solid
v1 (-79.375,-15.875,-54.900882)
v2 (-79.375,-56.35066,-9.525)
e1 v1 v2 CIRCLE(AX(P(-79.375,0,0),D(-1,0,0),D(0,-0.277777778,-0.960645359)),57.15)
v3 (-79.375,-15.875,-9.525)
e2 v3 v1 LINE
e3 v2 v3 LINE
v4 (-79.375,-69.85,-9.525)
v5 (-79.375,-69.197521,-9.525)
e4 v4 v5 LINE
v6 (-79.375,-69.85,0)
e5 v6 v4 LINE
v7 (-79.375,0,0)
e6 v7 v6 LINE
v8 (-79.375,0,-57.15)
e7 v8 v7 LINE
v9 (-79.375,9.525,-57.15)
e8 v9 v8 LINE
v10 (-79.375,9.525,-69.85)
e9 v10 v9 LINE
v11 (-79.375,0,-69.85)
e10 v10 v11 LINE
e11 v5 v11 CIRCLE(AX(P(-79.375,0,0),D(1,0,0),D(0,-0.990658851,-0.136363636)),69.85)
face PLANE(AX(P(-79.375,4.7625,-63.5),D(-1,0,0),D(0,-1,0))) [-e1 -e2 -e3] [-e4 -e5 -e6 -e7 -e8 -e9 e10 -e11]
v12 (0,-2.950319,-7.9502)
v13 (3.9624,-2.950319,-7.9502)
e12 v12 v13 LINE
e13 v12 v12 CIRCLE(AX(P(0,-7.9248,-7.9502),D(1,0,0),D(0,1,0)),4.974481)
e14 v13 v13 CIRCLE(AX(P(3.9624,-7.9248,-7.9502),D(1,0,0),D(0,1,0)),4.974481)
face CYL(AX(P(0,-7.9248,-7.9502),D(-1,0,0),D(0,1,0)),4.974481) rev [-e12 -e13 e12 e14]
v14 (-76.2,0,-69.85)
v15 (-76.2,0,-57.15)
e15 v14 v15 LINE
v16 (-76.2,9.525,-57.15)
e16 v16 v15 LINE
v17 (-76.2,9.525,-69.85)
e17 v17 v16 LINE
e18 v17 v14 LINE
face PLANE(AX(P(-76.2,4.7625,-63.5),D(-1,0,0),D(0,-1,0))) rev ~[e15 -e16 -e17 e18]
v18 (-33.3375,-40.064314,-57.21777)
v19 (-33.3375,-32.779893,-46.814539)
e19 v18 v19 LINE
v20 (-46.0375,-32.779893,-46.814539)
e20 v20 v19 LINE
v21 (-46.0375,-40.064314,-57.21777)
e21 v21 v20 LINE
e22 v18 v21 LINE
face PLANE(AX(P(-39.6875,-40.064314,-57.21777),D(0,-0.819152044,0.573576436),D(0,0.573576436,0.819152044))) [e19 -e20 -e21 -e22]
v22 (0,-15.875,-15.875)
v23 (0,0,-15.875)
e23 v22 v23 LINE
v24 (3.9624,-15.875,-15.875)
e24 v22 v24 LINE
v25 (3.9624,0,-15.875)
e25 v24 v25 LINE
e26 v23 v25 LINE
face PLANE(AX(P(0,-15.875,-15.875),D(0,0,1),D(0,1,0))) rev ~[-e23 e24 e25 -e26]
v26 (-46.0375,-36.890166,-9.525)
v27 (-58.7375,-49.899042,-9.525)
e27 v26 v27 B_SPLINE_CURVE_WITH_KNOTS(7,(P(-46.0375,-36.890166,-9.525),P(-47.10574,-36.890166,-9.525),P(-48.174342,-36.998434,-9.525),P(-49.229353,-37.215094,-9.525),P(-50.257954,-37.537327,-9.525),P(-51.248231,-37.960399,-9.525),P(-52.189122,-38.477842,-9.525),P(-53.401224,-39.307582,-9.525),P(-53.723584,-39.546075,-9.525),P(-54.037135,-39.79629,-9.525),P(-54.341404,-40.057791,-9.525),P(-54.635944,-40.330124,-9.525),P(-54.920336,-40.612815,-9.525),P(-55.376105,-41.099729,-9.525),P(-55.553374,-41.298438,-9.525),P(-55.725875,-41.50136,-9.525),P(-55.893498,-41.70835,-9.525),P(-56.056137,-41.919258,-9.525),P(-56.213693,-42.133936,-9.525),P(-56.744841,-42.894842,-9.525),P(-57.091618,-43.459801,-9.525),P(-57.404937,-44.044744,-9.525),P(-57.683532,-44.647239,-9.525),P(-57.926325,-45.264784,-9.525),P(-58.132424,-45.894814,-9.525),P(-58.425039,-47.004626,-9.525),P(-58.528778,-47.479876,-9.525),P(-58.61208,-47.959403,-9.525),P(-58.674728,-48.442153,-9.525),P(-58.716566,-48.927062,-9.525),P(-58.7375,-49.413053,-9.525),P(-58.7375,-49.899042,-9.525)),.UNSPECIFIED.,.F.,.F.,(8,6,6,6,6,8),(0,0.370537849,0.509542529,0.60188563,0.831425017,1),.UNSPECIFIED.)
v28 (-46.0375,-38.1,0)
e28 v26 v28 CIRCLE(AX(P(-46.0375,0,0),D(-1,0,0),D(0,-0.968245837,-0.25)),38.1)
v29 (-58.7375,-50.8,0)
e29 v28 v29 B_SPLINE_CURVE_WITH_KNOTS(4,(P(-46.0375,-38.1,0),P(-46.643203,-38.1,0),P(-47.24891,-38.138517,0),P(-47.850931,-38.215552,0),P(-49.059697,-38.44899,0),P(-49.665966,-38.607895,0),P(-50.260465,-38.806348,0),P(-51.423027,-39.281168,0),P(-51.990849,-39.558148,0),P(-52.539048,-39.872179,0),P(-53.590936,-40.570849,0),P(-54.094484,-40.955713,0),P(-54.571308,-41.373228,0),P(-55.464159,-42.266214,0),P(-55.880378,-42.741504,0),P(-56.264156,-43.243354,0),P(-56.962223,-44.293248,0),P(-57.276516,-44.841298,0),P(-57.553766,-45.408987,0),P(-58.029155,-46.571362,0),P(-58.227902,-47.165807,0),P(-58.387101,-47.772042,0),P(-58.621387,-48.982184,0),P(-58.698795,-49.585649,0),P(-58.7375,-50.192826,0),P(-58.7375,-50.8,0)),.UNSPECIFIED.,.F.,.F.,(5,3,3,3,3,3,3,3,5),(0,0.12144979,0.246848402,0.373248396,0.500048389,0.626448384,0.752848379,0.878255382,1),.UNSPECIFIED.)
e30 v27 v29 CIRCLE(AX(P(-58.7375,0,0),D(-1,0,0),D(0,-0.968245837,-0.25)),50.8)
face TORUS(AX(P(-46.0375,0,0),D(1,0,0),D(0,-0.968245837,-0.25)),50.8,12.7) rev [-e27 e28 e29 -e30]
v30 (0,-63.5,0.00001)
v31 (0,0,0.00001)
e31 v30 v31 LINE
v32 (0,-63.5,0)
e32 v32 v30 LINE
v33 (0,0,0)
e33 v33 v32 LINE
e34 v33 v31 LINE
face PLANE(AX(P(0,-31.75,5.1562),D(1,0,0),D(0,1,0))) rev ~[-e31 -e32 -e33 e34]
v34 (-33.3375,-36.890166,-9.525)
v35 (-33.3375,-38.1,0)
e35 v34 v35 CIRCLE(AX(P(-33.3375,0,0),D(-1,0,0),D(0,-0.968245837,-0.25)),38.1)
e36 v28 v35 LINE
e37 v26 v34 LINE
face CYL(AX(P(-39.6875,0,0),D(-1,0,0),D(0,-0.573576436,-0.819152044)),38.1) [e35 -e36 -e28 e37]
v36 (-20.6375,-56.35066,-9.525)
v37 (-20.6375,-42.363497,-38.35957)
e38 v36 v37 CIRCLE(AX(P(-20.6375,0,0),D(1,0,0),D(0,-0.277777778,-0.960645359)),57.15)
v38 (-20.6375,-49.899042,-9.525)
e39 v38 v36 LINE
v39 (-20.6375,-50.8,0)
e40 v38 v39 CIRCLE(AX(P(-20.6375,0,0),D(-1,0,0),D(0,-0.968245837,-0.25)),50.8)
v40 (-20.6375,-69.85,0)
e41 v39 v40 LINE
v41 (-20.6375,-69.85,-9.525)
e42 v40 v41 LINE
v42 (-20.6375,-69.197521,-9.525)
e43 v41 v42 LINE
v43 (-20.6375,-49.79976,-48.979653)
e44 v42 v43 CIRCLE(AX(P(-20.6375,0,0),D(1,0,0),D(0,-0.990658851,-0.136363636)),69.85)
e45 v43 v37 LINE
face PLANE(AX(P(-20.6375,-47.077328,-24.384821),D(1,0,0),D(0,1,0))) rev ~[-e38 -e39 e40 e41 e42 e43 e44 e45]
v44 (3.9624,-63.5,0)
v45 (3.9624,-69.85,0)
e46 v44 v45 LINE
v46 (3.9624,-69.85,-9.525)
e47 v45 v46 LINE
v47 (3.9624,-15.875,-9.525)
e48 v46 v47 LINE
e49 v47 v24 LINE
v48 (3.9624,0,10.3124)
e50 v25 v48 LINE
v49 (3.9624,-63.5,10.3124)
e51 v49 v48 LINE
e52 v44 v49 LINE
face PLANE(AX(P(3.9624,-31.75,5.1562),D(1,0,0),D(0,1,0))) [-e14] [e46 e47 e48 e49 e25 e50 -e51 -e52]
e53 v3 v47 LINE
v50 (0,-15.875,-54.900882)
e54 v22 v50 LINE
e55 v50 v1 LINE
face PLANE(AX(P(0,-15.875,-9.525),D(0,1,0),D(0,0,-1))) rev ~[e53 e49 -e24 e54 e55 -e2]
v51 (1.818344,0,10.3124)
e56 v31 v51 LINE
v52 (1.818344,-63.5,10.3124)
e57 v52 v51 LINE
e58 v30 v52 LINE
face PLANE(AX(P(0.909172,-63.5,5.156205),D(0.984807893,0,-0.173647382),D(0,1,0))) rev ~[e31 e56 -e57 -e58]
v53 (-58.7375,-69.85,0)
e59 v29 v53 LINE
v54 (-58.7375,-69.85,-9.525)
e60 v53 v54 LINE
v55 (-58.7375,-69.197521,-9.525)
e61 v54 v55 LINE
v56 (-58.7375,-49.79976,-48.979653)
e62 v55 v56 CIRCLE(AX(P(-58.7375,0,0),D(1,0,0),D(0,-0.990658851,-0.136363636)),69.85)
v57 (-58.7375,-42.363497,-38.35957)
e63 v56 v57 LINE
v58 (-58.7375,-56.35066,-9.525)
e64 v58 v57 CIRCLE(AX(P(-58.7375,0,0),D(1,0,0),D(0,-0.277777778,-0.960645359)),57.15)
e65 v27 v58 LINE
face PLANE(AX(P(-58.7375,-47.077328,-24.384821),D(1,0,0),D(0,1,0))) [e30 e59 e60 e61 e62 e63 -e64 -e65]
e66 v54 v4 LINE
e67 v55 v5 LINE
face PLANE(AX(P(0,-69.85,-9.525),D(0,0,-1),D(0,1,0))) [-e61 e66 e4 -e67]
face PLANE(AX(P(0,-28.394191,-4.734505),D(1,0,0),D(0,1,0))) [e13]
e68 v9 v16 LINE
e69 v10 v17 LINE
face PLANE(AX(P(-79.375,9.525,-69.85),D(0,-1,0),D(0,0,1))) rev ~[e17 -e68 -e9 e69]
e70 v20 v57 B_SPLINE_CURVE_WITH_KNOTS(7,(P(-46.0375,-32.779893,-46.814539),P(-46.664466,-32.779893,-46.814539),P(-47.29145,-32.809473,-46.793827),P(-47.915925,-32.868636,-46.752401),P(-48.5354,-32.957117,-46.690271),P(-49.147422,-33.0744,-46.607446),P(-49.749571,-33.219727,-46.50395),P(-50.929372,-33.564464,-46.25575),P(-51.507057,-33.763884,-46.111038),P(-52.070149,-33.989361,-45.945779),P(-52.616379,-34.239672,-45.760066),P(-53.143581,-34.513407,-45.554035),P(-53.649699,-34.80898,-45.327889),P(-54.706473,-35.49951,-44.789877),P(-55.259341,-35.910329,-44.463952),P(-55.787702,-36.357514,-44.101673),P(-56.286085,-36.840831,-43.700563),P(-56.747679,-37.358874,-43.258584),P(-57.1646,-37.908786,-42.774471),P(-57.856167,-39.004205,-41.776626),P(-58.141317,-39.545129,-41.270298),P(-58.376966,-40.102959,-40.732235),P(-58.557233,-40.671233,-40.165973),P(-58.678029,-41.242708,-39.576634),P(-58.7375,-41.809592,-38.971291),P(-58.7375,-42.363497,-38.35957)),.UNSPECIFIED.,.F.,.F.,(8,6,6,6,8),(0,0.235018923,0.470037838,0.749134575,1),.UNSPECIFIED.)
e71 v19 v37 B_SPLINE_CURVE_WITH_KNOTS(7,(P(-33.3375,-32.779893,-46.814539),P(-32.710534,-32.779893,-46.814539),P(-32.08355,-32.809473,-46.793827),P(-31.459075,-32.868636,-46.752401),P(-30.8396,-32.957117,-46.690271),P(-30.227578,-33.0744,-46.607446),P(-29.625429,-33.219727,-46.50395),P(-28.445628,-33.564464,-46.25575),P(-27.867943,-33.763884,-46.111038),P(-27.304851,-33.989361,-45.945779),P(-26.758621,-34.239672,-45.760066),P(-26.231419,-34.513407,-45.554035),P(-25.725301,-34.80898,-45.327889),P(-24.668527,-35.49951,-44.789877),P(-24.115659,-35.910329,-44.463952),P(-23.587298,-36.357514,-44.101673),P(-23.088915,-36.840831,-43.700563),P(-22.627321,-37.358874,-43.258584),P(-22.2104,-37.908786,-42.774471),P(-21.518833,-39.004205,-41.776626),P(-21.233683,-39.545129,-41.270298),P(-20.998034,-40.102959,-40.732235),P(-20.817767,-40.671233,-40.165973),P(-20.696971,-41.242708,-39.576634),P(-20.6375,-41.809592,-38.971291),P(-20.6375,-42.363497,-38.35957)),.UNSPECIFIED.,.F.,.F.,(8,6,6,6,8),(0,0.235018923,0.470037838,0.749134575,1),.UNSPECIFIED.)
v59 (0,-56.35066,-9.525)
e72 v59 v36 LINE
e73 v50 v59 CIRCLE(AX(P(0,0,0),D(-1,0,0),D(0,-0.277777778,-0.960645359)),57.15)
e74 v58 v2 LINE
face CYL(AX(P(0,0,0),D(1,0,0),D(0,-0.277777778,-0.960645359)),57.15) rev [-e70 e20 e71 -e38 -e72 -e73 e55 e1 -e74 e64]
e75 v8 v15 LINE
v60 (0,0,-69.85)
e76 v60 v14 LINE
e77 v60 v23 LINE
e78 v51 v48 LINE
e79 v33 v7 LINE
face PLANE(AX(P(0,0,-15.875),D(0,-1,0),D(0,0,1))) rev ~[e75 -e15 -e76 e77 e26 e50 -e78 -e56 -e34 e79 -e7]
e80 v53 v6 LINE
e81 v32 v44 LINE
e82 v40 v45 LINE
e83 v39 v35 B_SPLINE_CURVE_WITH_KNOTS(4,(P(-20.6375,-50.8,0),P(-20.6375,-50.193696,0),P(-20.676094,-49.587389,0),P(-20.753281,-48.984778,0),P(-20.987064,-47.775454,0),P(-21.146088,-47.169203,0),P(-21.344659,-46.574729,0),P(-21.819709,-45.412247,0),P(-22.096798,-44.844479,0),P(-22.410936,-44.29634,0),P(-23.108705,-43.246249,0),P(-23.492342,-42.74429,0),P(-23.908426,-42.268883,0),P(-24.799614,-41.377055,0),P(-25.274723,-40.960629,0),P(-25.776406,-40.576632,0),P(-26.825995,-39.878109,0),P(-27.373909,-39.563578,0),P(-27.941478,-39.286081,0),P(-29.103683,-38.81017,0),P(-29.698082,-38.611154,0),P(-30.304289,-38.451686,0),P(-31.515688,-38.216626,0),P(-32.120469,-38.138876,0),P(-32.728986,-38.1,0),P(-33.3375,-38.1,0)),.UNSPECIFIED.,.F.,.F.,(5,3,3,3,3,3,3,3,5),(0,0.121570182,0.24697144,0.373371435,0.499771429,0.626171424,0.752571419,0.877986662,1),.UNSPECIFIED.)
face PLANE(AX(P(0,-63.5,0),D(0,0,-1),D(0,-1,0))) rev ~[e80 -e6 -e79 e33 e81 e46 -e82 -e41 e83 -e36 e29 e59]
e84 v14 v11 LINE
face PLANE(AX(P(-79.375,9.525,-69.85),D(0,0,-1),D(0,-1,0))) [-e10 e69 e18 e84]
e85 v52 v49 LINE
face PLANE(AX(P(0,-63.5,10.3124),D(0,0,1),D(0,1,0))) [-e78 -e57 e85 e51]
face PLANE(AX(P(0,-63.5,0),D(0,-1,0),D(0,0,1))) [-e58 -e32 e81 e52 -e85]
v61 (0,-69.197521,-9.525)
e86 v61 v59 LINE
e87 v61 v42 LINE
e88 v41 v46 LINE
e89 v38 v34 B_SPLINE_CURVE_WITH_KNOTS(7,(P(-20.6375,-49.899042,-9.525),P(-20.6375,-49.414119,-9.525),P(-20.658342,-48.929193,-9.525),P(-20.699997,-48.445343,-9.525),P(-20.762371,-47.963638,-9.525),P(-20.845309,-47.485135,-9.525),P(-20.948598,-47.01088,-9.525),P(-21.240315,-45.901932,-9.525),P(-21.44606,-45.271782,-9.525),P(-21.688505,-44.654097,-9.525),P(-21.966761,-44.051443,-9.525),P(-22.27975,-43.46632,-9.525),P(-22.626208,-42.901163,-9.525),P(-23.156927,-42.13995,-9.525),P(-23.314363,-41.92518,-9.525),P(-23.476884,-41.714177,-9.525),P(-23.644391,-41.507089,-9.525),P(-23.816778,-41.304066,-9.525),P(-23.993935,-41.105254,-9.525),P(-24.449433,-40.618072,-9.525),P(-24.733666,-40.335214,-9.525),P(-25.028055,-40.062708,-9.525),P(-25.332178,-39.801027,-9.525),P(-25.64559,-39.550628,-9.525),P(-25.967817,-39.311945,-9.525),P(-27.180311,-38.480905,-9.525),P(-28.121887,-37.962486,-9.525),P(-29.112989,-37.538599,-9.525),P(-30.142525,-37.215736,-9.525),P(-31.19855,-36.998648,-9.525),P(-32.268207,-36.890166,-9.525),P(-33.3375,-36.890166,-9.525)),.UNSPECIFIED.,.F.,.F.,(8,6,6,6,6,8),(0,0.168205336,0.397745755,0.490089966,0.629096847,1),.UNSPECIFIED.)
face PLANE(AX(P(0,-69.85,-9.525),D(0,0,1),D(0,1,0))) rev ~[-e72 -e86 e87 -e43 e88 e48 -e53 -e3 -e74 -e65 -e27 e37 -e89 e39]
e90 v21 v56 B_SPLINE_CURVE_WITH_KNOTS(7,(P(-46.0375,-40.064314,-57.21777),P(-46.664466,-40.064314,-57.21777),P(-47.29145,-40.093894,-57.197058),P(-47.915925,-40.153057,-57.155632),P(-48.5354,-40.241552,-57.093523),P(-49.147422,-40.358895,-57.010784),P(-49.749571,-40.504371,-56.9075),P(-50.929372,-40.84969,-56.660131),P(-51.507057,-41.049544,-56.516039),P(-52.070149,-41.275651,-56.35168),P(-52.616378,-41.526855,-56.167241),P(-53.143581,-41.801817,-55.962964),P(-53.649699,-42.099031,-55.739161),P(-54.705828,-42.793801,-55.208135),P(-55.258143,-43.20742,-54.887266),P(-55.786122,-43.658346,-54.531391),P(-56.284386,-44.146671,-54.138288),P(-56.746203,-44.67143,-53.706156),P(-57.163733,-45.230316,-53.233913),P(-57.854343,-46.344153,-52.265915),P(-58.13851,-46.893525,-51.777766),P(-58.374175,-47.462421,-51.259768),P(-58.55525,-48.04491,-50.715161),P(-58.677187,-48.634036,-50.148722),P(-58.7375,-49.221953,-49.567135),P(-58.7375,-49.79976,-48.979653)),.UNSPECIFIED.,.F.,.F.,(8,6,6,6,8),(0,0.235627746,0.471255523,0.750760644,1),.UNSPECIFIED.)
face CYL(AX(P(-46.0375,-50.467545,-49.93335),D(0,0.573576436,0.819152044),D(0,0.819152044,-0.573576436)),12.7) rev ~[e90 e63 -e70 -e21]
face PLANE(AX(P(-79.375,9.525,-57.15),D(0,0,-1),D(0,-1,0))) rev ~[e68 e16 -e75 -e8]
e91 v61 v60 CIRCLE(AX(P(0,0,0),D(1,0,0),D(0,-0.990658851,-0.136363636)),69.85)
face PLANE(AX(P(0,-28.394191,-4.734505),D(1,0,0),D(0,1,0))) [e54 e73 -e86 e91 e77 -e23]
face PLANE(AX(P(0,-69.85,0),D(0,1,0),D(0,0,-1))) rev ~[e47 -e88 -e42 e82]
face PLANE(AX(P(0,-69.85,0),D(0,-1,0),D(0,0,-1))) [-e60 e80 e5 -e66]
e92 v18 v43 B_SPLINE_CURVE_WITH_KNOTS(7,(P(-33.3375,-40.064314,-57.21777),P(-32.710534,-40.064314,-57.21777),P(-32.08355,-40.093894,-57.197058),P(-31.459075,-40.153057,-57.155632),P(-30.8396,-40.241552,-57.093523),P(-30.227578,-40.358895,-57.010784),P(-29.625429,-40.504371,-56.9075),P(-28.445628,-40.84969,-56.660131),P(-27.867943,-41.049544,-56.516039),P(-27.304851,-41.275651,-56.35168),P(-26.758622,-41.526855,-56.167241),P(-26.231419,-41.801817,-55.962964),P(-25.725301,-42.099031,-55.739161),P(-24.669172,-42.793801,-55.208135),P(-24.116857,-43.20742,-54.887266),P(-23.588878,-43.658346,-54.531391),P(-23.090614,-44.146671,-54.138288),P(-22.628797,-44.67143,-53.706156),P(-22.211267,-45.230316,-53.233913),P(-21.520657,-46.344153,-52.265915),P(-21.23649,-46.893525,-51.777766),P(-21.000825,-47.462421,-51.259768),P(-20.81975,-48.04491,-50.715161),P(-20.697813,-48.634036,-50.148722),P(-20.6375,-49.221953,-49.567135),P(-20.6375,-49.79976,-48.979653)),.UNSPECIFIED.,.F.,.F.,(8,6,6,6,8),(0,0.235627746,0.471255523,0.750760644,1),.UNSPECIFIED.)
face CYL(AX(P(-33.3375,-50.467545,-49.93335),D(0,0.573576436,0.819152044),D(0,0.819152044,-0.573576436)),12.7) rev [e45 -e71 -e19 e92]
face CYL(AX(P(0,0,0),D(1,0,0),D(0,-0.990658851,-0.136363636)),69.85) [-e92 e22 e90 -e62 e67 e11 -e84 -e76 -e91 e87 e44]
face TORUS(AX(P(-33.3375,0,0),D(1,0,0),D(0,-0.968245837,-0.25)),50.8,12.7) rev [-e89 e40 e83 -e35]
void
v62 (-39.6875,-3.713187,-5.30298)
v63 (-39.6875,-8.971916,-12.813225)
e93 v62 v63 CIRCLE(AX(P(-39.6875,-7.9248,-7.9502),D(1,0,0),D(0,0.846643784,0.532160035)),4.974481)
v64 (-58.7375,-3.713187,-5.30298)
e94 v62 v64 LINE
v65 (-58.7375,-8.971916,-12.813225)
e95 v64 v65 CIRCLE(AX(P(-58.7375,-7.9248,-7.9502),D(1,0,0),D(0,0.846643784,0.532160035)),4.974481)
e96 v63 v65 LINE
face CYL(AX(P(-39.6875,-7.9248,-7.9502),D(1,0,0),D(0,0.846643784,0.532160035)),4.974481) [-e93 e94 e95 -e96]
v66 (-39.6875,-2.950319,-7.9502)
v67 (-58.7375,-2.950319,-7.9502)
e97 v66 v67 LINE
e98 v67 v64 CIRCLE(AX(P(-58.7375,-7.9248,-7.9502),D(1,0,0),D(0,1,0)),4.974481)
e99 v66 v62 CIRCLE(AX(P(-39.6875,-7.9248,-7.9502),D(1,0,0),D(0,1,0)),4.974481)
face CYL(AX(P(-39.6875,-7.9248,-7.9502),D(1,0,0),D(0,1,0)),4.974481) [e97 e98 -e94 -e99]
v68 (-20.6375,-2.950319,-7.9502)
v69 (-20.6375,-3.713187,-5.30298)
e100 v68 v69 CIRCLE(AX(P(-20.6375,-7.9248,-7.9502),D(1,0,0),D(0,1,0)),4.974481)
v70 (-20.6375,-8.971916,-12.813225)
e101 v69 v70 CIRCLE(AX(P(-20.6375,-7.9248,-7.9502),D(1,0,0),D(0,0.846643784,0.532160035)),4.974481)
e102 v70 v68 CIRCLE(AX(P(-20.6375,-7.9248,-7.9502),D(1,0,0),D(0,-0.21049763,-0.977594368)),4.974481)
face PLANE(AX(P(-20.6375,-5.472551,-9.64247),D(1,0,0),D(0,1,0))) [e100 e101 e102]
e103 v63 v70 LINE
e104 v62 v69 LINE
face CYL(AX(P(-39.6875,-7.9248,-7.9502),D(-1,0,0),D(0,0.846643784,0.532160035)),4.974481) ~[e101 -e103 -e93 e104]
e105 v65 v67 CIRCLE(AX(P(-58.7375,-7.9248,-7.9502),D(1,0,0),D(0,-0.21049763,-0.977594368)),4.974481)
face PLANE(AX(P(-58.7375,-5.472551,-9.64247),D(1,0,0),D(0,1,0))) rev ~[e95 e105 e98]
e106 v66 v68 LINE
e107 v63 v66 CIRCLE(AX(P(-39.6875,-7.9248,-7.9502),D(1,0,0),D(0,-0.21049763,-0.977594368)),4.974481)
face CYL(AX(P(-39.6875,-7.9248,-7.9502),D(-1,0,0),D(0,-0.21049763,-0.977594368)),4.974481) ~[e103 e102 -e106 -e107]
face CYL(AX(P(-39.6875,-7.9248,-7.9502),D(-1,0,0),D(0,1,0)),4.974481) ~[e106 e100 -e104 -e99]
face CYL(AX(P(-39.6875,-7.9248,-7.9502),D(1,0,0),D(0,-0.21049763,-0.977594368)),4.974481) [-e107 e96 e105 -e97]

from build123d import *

# Parameters (mm, degrees)
F1_DEPTH      = 79.375
F4_DEPTH      = 19.05
F4_DEPTH_BACK = 19.05
F5_R          = 12.7
F7_W          = 9.525
F7_H          = 12.7
F8_DEPTH      = 3.175
F6_W          = 63.5
F6_H          = 10.3124
F6_R          = 4.9744809982
F9_DEPTH      = 3.9624
F10_SIZE2     = 1.818344
F10_SIZE      = 10.31239


# Not quite as in the source:
# - a fillet or chamfer is up to 0.001 mm smaller than in the source, because OpenCascade refuses the exact size


with BuildPart() as f1:
    # F0 (on Right) → F1 (new body)
    with BuildSketch(Plane.YZ):
        with BuildLine():
            Line((0, -9.525), (0, 0))
            Line((0, 0), (-57.15, 0))
            ThreePointArc((-57.15, 0), (-56.9498143774, -4.779240775), (-56.350659934, -9.525))
            Line((-56.350659934, -9.525), (-15.875, -9.525))
            Line((-15.875, -9.525), (0, -9.525))
        make_face()
        with BuildLine():
            ThreePointArc((-56.350659934, -9.525), (-56.9498143774, -4.779240775), (-57.15, 0))
            Line((-57.15, 0), (-69.85, 0))
            ThreePointArc((-69.85, 0), (-69.6866892703, -4.7736609169), (-69.1975207287, -9.525))
            Line((-69.1975207287, -9.525), (-56.350659934, -9.525))
        make_face()
        with BuildLine():
            Line((0, -57.15), (0, -9.525))
            Line((0, -9.525), (-15.875, -9.525))
            Line((-15.875, -9.525), (-15.875, -54.9008822789))
            ThreePointArc((-15.875, -54.9008822789), (-8.0167661111, -56.5849269781), (0, -57.15))
        make_face()
        with BuildLine():
            ThreePointArc((-69.1975207287, -9.525), (-69.6866892703, -4.7736609169), (-69.85, 0))
            Line((-69.85, 0), (-69.85, -9.525))
            Line((-69.85, -9.525), (-69.1975207287, -9.525))
        make_face()
        with BuildLine():
            ThreePointArc((-15.875, -54.9008822789), (-42.648319561, -38.042651572), (-56.350659934, -9.525))
            Line((-56.350659934, -9.525), (-69.1975207287, -9.525))
            ThreePointArc((-69.1975207287, -9.525), (-45.900442536, -52.6514185469), (0, -69.85))
            Line((0, -69.85), (0, -57.15))
            ThreePointArc((0, -57.15), (-8.0167661111, -56.5849269781), (-15.875, -54.9008822789))
        make_face()
    extrude(amount=-F1_DEPTH)

    # F3 (on offset) → F4 (cut, two sides)
    with BuildSketch(Plane.YZ.offset(-39.6875)) as f4_sk:
        with BuildLine():
            ThreePointArc((-21.853262225, -31.2096928874), (-33.7951127441, -17.5926221643), (-38.1, 0))
            Line((-38.1, 0), (-69.85, 0))
            Line((-69.85, 0), (-69.85, -9.525))
            Line((-69.85, -9.525), (-69.1975207287, -9.525))
            ThreePointArc((-69.1975207287, -9.525), (-59.6086170026, -36.4120210787), (-40.0643140791, -57.2177702936))
            Line((-40.0643140791, -57.2177702936), (-21.853262225, -31.2096928874))
        make_face()
        with BuildLine():
            ThreePointArc((-2.9503190018, -7.9502), (-3.1448391156, -6.5727258097), (-3.7131865837, -5.3029800181))
            Line((-3.7131865837, -5.3029800181), (-8.9719164583, -12.8132246066))
            ThreePointArc((-8.9719164583, -12.8132246066), (-4.7993720072, -11.8202337289), (-2.9503190018, -7.9502))
        make_face()
        with BuildLine():
            Line((-8.9719164583, -12.8132246066), (-3.7131865837, -5.3029800181))
            ThreePointArc((-3.7131865837, -5.3029800181), (-11.9996562789, -5.0969549164), (-8.9719164583, -12.8132246066))
        make_face()
    extrude(amount=-F4_DEPTH, mode=Mode.SUBTRACT)
    extrude(f4_sk.sketch, amount=F4_DEPTH_BACK, mode=Mode.SUBTRACT)

    # F5
    f5_edges = [f1.edges().sort_by_distance(p)[0] for p in [
        (-58.7375, -37.796331, -4.800764),
        (-58.7375, -36.422104, -52.016155),
        (-20.6375, -37.796331, -4.800764),
        (-20.6375, -36.422104, -52.016155),
    ]]
    fillet(f5_edges, radius=F5_R)

    # F7 (on face) → F8 (join)
    with BuildSketch(Plane(origin=(-79.375, 0, 0), x_dir=(0, -1, 0), z_dir=(-1, 0, 0))):
        with Locations((-4.7625, -63.5)):
            Rectangle(F7_W, F7_H)
    extrude(amount=-F8_DEPTH)

    # F6 (on face) → F9 (join)
    with BuildSketch(Plane.YZ):
        with Locations((-31.75, 5.1562)):
            Rectangle(F6_W, F6_H)
        Polygon((0, -15.875), (0, 0), (-63.5, 0), (-69.85, 0), (-69.85, -9.525), (-69.1975207287, -9.525), (-56.350659934, -9.525), (-15.875, -9.525), (-15.875, -15.875), align=None)
        with Locations((-7.9248, -7.9502)):
            Circle(F6_R, mode=Mode.SUBTRACT)
    extrude(amount=F9_DEPTH)

    # F10 (size 10.3124 and 1.8183543559 in the source; OpenCascade refuses exactly that, so slightly less here)
    f10_edges = [f1.edges().sort_by_distance(p)[0] for p in [
        (0, -31.75, 10.3124),
    ]]
    f10_side = f1.faces().sort_by_distance((0, -31.75, 5.1562))[0]
    chamfer(f10_edges, length=F10_SIZE, length2=F10_SIZE2, reference=f10_side)


solid = f1.part
